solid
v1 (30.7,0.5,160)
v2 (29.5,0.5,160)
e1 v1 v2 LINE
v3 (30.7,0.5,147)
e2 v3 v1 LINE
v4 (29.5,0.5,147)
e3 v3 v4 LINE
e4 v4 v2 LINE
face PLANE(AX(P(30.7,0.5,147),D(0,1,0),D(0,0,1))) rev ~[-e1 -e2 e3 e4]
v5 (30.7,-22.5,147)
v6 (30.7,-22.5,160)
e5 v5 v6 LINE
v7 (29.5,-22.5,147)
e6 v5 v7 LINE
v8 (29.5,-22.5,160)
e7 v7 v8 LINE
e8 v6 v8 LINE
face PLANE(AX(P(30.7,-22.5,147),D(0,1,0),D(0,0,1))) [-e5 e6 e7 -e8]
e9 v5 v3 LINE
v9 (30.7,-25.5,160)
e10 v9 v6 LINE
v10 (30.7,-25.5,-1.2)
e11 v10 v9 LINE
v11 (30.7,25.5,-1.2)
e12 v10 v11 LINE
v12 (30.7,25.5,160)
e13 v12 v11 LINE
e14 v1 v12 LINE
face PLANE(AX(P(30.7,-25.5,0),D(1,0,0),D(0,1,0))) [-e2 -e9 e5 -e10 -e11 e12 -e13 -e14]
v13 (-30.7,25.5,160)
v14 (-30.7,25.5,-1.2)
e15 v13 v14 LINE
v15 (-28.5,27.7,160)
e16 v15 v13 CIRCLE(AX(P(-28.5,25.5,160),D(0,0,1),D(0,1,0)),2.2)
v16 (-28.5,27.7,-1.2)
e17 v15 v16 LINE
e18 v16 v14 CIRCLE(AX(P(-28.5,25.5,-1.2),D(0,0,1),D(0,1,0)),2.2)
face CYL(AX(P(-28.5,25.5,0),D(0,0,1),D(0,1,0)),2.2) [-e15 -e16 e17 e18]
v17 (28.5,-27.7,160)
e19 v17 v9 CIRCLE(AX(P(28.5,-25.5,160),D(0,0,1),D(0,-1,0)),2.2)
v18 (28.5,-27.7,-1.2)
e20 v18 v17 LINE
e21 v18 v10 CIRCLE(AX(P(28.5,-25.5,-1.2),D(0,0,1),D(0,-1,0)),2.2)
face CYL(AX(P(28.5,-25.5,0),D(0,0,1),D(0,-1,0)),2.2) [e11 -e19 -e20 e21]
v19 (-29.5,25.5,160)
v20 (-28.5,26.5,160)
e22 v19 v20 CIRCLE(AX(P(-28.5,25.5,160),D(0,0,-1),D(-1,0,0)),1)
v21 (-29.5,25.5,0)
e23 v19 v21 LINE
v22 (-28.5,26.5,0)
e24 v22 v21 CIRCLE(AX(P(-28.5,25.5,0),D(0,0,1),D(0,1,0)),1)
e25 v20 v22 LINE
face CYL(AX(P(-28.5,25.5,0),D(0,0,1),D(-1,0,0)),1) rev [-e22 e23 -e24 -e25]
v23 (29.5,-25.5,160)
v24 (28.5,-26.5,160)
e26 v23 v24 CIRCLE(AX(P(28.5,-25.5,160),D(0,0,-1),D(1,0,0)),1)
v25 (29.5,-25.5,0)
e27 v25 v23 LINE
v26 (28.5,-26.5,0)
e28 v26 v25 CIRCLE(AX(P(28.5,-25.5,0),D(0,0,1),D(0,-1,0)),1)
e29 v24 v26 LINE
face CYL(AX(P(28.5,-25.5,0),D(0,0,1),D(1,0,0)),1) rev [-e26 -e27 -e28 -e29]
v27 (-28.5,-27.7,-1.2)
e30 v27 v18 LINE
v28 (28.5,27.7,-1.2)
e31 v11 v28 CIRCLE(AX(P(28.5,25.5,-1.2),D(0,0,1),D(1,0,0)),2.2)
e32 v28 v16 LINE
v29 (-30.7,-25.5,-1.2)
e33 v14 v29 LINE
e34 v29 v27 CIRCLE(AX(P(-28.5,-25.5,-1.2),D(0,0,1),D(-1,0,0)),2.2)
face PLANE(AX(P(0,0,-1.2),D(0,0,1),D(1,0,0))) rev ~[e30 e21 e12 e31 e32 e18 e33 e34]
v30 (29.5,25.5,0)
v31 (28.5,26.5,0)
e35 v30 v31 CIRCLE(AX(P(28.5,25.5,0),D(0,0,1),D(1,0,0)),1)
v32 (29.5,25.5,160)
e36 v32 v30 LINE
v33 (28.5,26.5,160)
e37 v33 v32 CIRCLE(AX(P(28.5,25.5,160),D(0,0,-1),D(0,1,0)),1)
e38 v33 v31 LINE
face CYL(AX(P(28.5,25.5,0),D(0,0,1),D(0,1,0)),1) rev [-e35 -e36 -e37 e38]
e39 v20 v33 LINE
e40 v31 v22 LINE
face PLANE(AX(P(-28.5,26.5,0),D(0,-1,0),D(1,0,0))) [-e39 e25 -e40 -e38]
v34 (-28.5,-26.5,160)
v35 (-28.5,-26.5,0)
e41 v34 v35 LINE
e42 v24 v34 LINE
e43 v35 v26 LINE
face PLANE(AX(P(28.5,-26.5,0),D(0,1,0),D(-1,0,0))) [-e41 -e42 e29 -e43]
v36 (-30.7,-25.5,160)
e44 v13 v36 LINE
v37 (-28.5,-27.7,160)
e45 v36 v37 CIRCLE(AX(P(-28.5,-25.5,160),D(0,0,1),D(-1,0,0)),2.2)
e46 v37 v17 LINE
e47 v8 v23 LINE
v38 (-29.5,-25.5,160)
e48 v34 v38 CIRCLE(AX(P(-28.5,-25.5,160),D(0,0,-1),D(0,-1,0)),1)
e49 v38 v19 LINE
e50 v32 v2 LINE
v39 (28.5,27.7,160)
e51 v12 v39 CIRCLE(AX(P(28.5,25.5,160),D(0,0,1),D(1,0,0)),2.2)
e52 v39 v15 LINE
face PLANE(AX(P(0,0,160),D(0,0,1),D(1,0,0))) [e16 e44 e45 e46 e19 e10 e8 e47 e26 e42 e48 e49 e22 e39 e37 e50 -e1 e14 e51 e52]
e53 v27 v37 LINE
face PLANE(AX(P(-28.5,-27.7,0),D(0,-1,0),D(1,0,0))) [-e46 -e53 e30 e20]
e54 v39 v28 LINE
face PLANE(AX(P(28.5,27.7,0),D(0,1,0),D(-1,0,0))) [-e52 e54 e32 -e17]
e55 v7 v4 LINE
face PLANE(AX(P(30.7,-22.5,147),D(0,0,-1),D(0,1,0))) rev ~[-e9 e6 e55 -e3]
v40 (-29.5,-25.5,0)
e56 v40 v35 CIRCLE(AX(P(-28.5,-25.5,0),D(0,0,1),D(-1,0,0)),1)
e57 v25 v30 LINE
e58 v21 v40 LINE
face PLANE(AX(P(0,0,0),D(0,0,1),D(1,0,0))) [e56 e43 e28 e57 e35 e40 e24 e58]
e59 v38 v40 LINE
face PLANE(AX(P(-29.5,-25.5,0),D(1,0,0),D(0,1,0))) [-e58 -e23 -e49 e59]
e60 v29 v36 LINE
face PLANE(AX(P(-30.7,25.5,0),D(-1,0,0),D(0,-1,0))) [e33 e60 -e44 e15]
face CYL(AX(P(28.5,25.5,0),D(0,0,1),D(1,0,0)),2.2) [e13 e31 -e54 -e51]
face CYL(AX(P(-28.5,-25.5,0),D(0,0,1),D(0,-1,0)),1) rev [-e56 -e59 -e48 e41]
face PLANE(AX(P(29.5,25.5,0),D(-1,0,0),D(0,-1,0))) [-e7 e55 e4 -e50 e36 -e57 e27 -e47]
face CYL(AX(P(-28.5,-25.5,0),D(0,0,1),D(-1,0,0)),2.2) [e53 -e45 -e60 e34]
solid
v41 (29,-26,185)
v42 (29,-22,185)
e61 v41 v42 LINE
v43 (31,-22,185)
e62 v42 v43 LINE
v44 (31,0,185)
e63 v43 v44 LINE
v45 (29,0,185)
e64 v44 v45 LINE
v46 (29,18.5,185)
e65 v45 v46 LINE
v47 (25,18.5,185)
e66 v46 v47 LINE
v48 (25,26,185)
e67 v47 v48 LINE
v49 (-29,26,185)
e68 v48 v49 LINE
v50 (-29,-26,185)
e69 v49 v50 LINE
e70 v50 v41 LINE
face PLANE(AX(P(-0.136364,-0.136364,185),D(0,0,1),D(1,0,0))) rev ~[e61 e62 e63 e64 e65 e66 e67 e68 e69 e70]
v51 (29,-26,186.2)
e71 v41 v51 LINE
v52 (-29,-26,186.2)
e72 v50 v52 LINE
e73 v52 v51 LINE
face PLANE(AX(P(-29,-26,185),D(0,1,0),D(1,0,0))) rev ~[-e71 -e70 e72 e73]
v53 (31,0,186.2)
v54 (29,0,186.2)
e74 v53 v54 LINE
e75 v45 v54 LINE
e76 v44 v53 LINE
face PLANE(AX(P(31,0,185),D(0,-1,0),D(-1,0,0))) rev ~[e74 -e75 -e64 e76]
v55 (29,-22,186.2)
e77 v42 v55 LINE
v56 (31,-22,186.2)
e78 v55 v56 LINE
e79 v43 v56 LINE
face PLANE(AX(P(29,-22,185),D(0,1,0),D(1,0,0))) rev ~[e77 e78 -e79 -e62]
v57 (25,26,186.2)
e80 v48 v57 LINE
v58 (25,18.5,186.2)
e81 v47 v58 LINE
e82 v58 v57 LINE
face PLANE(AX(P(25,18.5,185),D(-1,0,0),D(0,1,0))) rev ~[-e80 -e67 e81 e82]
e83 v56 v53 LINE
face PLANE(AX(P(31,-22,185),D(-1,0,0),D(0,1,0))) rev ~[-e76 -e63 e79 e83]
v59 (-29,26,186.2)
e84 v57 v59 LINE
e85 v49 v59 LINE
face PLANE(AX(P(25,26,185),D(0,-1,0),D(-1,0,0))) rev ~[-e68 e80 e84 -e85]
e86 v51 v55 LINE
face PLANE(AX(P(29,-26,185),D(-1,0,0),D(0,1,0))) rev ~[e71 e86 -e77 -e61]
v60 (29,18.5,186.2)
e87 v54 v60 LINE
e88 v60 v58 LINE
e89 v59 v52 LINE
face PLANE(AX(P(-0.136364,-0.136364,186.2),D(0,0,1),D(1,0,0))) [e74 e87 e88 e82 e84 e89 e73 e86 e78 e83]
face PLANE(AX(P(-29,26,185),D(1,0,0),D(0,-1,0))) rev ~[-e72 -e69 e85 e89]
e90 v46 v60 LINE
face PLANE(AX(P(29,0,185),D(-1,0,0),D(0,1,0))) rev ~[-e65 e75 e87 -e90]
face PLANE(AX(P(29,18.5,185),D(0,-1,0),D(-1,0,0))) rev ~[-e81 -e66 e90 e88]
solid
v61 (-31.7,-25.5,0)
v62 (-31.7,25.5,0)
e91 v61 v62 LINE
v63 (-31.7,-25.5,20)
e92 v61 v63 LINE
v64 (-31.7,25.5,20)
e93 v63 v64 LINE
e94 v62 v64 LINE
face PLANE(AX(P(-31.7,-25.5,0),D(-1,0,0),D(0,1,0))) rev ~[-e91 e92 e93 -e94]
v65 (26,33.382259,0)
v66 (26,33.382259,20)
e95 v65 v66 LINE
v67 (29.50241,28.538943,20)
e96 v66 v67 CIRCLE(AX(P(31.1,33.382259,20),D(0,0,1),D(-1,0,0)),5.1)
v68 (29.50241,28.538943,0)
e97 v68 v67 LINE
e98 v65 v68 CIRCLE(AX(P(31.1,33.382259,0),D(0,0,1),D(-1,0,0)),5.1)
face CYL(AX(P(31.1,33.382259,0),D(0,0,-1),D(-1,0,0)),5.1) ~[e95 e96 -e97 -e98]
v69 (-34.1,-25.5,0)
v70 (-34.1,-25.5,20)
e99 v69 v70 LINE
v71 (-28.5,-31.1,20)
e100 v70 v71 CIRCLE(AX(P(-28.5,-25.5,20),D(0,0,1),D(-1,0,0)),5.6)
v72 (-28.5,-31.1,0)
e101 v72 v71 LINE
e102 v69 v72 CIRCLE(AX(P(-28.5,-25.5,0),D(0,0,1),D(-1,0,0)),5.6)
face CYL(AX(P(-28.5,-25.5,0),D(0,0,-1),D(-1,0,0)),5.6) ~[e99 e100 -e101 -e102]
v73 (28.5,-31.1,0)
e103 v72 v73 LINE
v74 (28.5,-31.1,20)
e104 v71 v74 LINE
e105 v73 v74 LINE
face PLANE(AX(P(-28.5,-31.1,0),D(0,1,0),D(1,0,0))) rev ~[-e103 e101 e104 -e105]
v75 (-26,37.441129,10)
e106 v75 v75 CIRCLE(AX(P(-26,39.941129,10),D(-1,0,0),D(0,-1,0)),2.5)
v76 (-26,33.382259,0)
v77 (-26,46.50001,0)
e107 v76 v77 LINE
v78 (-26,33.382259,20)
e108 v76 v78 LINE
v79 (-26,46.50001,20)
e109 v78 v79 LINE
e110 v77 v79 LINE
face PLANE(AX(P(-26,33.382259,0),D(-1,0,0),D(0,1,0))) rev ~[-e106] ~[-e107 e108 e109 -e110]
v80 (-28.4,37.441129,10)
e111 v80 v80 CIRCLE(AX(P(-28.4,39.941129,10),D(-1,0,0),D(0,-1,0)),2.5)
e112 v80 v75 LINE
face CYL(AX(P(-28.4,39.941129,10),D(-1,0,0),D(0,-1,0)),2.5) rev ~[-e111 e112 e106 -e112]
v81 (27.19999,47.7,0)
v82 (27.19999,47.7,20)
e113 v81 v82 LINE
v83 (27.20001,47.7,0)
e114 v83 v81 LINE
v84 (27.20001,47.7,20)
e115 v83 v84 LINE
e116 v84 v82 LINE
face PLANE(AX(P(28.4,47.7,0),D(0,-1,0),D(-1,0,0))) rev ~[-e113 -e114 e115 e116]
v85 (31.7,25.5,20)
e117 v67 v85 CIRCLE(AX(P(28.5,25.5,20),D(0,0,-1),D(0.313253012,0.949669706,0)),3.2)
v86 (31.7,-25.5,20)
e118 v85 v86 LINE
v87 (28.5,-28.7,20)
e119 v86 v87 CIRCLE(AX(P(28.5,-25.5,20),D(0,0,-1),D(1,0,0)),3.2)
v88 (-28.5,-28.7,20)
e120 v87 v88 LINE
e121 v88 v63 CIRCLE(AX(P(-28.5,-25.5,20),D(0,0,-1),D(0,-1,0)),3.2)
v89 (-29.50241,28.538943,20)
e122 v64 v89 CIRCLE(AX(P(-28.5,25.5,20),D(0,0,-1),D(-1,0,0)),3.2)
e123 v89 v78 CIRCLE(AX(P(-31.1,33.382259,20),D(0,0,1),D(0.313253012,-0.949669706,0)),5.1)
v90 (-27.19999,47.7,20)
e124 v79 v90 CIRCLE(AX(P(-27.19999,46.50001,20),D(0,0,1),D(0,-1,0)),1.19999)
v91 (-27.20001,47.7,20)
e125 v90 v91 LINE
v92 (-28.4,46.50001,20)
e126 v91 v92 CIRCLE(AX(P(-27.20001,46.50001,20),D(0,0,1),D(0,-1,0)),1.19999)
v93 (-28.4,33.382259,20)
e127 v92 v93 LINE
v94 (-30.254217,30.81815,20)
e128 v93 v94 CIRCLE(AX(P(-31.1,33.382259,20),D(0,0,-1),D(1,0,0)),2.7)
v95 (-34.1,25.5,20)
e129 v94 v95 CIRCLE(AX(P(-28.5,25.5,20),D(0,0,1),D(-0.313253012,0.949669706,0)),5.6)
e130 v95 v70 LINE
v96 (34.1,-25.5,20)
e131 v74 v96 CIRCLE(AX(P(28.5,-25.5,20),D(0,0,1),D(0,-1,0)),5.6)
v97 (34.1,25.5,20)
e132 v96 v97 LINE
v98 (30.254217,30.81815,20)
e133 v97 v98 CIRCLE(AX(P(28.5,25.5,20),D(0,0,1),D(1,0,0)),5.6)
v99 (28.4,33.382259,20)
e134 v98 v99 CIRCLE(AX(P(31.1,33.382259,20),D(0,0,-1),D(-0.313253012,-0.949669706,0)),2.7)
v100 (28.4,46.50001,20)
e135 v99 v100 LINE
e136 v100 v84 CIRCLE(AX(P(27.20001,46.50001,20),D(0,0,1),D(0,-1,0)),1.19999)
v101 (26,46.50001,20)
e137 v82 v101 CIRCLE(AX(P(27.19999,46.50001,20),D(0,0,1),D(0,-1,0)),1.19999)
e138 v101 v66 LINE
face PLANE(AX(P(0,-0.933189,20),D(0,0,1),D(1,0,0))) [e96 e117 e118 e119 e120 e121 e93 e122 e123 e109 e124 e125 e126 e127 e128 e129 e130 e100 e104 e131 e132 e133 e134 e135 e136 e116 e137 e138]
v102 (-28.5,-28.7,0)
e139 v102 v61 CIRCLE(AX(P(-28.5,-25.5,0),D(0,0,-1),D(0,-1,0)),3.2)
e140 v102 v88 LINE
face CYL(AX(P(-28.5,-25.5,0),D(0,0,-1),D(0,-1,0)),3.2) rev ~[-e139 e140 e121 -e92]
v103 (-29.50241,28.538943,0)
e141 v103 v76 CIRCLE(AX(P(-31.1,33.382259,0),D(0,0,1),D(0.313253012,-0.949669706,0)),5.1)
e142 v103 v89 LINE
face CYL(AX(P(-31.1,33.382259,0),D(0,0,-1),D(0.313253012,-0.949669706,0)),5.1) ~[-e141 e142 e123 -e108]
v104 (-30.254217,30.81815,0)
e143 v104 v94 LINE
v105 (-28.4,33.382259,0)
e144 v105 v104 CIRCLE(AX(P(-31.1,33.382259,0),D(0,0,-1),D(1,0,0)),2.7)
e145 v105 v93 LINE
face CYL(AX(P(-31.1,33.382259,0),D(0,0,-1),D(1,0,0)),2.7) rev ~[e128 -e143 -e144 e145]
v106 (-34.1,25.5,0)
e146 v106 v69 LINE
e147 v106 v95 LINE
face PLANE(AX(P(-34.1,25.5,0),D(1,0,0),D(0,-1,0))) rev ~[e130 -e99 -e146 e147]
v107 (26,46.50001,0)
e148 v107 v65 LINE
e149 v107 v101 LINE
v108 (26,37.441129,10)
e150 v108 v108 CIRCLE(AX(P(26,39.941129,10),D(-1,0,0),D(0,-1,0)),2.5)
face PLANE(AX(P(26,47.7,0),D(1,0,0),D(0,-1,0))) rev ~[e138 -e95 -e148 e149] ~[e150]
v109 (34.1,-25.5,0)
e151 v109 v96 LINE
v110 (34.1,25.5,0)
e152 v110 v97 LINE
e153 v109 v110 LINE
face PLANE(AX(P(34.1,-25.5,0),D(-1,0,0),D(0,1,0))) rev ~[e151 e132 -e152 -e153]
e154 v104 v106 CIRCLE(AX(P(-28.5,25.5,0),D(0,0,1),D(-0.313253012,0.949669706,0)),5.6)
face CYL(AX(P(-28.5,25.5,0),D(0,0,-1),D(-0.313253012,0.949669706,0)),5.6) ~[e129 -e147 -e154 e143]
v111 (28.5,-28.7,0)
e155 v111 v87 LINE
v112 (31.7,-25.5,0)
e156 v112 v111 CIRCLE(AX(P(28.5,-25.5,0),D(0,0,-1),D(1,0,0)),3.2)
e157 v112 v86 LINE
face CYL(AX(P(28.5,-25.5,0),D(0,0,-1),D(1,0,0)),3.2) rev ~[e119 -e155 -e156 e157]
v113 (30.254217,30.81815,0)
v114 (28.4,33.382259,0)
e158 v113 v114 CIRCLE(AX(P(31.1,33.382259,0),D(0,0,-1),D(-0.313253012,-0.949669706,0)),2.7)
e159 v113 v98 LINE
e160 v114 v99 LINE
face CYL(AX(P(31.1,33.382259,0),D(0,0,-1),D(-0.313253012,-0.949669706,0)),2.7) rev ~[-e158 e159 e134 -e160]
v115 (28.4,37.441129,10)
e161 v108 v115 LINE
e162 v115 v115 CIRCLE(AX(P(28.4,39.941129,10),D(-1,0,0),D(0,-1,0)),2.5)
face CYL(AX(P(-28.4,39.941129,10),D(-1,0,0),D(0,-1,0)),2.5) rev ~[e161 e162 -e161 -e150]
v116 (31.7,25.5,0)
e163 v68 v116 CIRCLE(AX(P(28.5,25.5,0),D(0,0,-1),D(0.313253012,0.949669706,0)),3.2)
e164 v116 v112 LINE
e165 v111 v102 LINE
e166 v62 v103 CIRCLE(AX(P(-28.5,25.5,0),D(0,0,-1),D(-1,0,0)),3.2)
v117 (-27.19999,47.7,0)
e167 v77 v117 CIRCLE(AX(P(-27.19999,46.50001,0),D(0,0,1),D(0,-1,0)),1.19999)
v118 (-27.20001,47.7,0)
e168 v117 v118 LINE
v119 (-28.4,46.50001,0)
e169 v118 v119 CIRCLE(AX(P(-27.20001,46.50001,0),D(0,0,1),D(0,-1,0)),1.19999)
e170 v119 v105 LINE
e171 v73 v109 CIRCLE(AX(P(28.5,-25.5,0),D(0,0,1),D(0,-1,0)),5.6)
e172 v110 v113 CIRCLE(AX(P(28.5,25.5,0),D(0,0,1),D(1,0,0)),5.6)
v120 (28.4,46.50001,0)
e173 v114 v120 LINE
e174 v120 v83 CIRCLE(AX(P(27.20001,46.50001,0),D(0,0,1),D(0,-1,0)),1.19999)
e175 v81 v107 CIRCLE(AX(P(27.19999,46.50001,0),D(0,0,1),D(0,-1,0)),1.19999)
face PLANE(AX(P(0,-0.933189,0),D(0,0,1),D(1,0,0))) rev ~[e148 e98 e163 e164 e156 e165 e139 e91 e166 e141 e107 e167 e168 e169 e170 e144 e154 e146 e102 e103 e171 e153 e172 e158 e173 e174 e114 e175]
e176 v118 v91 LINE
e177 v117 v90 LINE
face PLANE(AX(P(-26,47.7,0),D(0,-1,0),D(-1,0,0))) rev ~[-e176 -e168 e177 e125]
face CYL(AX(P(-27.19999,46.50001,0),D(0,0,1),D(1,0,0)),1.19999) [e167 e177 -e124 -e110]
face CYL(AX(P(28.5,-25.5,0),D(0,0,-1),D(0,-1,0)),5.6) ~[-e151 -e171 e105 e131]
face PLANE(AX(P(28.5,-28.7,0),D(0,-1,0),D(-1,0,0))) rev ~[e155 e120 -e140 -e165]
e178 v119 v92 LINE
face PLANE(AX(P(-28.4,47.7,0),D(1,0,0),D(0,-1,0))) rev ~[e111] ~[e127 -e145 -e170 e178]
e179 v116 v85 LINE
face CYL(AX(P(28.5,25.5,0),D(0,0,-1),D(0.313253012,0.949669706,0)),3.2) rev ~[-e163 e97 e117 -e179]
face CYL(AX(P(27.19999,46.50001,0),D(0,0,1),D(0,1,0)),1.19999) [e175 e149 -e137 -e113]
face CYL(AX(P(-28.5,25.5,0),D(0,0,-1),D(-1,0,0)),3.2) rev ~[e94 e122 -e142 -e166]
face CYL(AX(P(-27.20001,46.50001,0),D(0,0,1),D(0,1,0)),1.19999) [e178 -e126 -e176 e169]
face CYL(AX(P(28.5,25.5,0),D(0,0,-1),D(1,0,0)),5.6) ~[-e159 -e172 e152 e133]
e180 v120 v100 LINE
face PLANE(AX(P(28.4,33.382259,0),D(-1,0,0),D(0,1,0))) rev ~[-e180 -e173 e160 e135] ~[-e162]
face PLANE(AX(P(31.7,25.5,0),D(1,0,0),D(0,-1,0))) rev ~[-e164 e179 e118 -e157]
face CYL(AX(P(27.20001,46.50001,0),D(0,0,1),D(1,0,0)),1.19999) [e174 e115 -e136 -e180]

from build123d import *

# Parameters (mm, degrees)
F1_DEPTH      = 160
F1_DEPTH_BACK = 1.2
F2_DEPTH      = 1.2
F3_W          = 23
F3_H          = 13
F4_DEPTH      = 1.2
F6_W          = 0.5
F6_H          = 22
F6_W_2        = 1.5
F7_DEPTH      = 1.2
F8_DEPTH      = 20
F9_R          = 1.19999
F10_R         = 2.5
F11_DEPTH     = 62.501


# Not quite as in the source:
# - a fillet or chamfer is up to 0.001 mm smaller than in the source, because OpenCascade refuses the exact size


with BuildPart() as f1:
    # F0 (on Top) → F1 (new body, two sides)
    with BuildSketch(Plane.XY) as f1_sk:
        with BuildLine():
            Line((-30.7, 25.5), (-30.7, -25.5))
            ThreePointArc((-30.7, -25.5), (-30.0556349186, -27.0556349186), (-28.5, -27.7))
            Line((-28.5, -27.7), (28.5, -27.7))
            ThreePointArc((28.5, -27.7), (30.0556349186, -27.0556349186), (30.7, -25.5))
            Line((30.7, -25.5), (30.7, 25.5))
            ThreePointArc((30.7, 25.5), (30.0556349186, 27.0556349186), (28.5, 27.7))
            Line((28.5, 27.7), (-28.5, 27.7))
            ThreePointArc((-28.5, 27.7), (-30.0556349186, 27.0556349186), (-30.7, 25.5))
        make_face()
        with BuildLine():
            ThreePointArc((29.5, -25.5), (29.2071067812, -26.2071067812), (28.5, -26.5))
            Line((28.5, -26.5), (-28.5, -26.5))
            ThreePointArc((-28.5, -26.5), (-29.2071067812, -26.2071067812), (-29.5, -25.5))
            Line((-29.5, -25.5), (-29.5, 25.5))
            ThreePointArc((-29.5, 25.5), (-29.2071067812, 26.2071067812), (-28.5, 26.5))
            Line((-28.5, 26.5), (28.5, 26.5))
            ThreePointArc((28.5, 26.5), (29.2071067812, 26.2071067812), (29.5, 25.5))
            Line((29.5, 25.5), (29.5, -25.5))
        make_face(mode=Mode.SUBTRACT)
    extrude(amount=F1_DEPTH)
    extrude(f1_sk.sketch, amount=-F1_DEPTH_BACK)

    # F0 (on Top) → F2 (join)
    with BuildSketch(Plane.XY):
        with BuildLine():
            Line((-28.5, -26.5), (28.5, -26.5))
            ThreePointArc((28.5, -26.5), (29.2071067812, -26.2071067812), (29.5, -25.5))
            Line((29.5, -25.5), (29.5, 25.5))
            ThreePointArc((29.5, 25.5), (29.2071067812, 26.2071067812), (28.5, 26.5))
            Line((28.5, 26.5), (-28.5, 26.5))
            ThreePointArc((-28.5, 26.5), (-29.2071067812, 26.2071067812), (-29.5, 25.5))
            Line((-29.5, 25.5), (-29.5, -25.5))
            ThreePointArc((-29.5, -25.5), (-29.2071067812, -26.2071067812), (-28.5, -26.5))
        make_face()
    extrude(amount=-F2_DEPTH)

    # F3 (on face) → F4 (cut, through all)
    with BuildSketch(Plane.YZ.offset(30.7)):
        with Locations((-11, 153.5)):
            Rectangle(F3_W, F3_H)
    extrude(amount=-F4_DEPTH, mode=Mode.SUBTRACT)


with BuildPart() as f7:
    # F6 (on offset) → F7 (new body)
    with BuildSketch(Plane.XY.offset(185)):
        Polygon((29, -22), (29, 0), (29, 18.5), (25, 18.5), (25, 26), (-29, 26), (-29, -26), (29, -26), align=None)
        with Locations((29.25, -11)):
            Rectangle(F6_W, F6_H)
        with Locations((30.25, -11)):
            Rectangle(F6_W_2, F6_H)
    extrude(amount=F7_DEPTH)


with BuildPart() as f8:
    # F0 (on Top) → F8 (new body)
    with BuildSketch(Plane.XY):
        with BuildLine():
            ThreePointArc((29.5024096386, 28.5389430591), (31.0930398033, 27.3751385491), (31.7, 25.5))
            Line((31.7, 25.5), (31.7, -25.5))
            ThreePointArc((31.7, -25.5), (30.7627416998, -27.7627416998), (28.5, -28.7))
            Line((28.5, -28.7), (-28.5, -28.7))
            ThreePointArc((-28.5, -28.7), (-30.7627416998, -27.7627416998), (-31.7, -25.5))
            Line((-31.7, -25.5), (-31.7, 25.5))
            ThreePointArc((-31.7, 25.5), (-31.0930398033, 27.3751385491), (-29.5024096386, 28.5389430591))
            ThreePointArc((-29.5024096386, 28.5389430591), (-26.9673428134, 30.393756497), (-26, 33.3822585596))
            Line((-26, 33.3822585596), (-26, 47.7))
            Line((-26, 47.7), (-28.4, 47.7))
            Line((-28.4, 47.7), (-28.4, 33.3822585596))
            ThreePointArc((-28.4, 33.3822585596), (-28.9121226659, 31.8001104088), (-30.2542168675, 30.8181503534))
            ThreePointArc((-30.2542168675, 30.8181503534), (-33.0378196558, 28.7814924609), (-34.1, 25.5))
            Line((-34.1, 25.5), (-34.1, -25.5))
            ThreePointArc((-34.1, -25.5), (-32.4597979746, -29.4597979746), (-28.5, -31.1))
            Line((-28.5, -31.1), (28.5, -31.1))
            ThreePointArc((28.5, -31.1), (32.4597979746, -29.4597979746), (34.1, -25.5))
            Line((34.1, -25.5), (34.1, 25.5))
            ThreePointArc((34.1, 25.5), (33.0378196558, 28.7814924609), (30.2542168675, 30.8181503534))
            ThreePointArc((30.2542168675, 30.8181503534), (28.9121226659, 31.8001104088), (28.4, 33.3822585596))
            Line((28.4, 33.3822585596), (28.4, 47.7))
            Line((28.4, 47.7), (26, 47.7))
            Line((26, 47.7), (26, 33.3822585596))
            ThreePointArc((26, 33.3822585596), (26.9673428134, 30.393756497), (29.5024096386, 28.5389430591))
        make_face()
    extrude(amount=F8_DEPTH)

    # F9 (radius 1.2 in the source; OpenCascade refuses exactly that, so slightly less here)
    f9_edges = [f8.edges().sort_by_distance(p)[0] for p in [
        (-28.4, 47.7, 10),
        (-26, 47.7, 10),
        (28.4, 47.7, 10),
        (26, 47.7, 10),
    ]]
    fillet(f9_edges, radius=F9_R)

    # F10 (on face) → F11 (cut, through all)
    with BuildSketch(Plane(origin=(-28.4, 0, 0), x_dir=(0, -1, 0), z_dir=(-1, 0, 0))):
        with Locations((-39.9411292798, 10)):
            Circle(F10_R)
    extrude(amount=-F11_DEPTH, mode=Mode.SUBTRACT)


solid = Compound([f1.part, f7.part, f8.part])
